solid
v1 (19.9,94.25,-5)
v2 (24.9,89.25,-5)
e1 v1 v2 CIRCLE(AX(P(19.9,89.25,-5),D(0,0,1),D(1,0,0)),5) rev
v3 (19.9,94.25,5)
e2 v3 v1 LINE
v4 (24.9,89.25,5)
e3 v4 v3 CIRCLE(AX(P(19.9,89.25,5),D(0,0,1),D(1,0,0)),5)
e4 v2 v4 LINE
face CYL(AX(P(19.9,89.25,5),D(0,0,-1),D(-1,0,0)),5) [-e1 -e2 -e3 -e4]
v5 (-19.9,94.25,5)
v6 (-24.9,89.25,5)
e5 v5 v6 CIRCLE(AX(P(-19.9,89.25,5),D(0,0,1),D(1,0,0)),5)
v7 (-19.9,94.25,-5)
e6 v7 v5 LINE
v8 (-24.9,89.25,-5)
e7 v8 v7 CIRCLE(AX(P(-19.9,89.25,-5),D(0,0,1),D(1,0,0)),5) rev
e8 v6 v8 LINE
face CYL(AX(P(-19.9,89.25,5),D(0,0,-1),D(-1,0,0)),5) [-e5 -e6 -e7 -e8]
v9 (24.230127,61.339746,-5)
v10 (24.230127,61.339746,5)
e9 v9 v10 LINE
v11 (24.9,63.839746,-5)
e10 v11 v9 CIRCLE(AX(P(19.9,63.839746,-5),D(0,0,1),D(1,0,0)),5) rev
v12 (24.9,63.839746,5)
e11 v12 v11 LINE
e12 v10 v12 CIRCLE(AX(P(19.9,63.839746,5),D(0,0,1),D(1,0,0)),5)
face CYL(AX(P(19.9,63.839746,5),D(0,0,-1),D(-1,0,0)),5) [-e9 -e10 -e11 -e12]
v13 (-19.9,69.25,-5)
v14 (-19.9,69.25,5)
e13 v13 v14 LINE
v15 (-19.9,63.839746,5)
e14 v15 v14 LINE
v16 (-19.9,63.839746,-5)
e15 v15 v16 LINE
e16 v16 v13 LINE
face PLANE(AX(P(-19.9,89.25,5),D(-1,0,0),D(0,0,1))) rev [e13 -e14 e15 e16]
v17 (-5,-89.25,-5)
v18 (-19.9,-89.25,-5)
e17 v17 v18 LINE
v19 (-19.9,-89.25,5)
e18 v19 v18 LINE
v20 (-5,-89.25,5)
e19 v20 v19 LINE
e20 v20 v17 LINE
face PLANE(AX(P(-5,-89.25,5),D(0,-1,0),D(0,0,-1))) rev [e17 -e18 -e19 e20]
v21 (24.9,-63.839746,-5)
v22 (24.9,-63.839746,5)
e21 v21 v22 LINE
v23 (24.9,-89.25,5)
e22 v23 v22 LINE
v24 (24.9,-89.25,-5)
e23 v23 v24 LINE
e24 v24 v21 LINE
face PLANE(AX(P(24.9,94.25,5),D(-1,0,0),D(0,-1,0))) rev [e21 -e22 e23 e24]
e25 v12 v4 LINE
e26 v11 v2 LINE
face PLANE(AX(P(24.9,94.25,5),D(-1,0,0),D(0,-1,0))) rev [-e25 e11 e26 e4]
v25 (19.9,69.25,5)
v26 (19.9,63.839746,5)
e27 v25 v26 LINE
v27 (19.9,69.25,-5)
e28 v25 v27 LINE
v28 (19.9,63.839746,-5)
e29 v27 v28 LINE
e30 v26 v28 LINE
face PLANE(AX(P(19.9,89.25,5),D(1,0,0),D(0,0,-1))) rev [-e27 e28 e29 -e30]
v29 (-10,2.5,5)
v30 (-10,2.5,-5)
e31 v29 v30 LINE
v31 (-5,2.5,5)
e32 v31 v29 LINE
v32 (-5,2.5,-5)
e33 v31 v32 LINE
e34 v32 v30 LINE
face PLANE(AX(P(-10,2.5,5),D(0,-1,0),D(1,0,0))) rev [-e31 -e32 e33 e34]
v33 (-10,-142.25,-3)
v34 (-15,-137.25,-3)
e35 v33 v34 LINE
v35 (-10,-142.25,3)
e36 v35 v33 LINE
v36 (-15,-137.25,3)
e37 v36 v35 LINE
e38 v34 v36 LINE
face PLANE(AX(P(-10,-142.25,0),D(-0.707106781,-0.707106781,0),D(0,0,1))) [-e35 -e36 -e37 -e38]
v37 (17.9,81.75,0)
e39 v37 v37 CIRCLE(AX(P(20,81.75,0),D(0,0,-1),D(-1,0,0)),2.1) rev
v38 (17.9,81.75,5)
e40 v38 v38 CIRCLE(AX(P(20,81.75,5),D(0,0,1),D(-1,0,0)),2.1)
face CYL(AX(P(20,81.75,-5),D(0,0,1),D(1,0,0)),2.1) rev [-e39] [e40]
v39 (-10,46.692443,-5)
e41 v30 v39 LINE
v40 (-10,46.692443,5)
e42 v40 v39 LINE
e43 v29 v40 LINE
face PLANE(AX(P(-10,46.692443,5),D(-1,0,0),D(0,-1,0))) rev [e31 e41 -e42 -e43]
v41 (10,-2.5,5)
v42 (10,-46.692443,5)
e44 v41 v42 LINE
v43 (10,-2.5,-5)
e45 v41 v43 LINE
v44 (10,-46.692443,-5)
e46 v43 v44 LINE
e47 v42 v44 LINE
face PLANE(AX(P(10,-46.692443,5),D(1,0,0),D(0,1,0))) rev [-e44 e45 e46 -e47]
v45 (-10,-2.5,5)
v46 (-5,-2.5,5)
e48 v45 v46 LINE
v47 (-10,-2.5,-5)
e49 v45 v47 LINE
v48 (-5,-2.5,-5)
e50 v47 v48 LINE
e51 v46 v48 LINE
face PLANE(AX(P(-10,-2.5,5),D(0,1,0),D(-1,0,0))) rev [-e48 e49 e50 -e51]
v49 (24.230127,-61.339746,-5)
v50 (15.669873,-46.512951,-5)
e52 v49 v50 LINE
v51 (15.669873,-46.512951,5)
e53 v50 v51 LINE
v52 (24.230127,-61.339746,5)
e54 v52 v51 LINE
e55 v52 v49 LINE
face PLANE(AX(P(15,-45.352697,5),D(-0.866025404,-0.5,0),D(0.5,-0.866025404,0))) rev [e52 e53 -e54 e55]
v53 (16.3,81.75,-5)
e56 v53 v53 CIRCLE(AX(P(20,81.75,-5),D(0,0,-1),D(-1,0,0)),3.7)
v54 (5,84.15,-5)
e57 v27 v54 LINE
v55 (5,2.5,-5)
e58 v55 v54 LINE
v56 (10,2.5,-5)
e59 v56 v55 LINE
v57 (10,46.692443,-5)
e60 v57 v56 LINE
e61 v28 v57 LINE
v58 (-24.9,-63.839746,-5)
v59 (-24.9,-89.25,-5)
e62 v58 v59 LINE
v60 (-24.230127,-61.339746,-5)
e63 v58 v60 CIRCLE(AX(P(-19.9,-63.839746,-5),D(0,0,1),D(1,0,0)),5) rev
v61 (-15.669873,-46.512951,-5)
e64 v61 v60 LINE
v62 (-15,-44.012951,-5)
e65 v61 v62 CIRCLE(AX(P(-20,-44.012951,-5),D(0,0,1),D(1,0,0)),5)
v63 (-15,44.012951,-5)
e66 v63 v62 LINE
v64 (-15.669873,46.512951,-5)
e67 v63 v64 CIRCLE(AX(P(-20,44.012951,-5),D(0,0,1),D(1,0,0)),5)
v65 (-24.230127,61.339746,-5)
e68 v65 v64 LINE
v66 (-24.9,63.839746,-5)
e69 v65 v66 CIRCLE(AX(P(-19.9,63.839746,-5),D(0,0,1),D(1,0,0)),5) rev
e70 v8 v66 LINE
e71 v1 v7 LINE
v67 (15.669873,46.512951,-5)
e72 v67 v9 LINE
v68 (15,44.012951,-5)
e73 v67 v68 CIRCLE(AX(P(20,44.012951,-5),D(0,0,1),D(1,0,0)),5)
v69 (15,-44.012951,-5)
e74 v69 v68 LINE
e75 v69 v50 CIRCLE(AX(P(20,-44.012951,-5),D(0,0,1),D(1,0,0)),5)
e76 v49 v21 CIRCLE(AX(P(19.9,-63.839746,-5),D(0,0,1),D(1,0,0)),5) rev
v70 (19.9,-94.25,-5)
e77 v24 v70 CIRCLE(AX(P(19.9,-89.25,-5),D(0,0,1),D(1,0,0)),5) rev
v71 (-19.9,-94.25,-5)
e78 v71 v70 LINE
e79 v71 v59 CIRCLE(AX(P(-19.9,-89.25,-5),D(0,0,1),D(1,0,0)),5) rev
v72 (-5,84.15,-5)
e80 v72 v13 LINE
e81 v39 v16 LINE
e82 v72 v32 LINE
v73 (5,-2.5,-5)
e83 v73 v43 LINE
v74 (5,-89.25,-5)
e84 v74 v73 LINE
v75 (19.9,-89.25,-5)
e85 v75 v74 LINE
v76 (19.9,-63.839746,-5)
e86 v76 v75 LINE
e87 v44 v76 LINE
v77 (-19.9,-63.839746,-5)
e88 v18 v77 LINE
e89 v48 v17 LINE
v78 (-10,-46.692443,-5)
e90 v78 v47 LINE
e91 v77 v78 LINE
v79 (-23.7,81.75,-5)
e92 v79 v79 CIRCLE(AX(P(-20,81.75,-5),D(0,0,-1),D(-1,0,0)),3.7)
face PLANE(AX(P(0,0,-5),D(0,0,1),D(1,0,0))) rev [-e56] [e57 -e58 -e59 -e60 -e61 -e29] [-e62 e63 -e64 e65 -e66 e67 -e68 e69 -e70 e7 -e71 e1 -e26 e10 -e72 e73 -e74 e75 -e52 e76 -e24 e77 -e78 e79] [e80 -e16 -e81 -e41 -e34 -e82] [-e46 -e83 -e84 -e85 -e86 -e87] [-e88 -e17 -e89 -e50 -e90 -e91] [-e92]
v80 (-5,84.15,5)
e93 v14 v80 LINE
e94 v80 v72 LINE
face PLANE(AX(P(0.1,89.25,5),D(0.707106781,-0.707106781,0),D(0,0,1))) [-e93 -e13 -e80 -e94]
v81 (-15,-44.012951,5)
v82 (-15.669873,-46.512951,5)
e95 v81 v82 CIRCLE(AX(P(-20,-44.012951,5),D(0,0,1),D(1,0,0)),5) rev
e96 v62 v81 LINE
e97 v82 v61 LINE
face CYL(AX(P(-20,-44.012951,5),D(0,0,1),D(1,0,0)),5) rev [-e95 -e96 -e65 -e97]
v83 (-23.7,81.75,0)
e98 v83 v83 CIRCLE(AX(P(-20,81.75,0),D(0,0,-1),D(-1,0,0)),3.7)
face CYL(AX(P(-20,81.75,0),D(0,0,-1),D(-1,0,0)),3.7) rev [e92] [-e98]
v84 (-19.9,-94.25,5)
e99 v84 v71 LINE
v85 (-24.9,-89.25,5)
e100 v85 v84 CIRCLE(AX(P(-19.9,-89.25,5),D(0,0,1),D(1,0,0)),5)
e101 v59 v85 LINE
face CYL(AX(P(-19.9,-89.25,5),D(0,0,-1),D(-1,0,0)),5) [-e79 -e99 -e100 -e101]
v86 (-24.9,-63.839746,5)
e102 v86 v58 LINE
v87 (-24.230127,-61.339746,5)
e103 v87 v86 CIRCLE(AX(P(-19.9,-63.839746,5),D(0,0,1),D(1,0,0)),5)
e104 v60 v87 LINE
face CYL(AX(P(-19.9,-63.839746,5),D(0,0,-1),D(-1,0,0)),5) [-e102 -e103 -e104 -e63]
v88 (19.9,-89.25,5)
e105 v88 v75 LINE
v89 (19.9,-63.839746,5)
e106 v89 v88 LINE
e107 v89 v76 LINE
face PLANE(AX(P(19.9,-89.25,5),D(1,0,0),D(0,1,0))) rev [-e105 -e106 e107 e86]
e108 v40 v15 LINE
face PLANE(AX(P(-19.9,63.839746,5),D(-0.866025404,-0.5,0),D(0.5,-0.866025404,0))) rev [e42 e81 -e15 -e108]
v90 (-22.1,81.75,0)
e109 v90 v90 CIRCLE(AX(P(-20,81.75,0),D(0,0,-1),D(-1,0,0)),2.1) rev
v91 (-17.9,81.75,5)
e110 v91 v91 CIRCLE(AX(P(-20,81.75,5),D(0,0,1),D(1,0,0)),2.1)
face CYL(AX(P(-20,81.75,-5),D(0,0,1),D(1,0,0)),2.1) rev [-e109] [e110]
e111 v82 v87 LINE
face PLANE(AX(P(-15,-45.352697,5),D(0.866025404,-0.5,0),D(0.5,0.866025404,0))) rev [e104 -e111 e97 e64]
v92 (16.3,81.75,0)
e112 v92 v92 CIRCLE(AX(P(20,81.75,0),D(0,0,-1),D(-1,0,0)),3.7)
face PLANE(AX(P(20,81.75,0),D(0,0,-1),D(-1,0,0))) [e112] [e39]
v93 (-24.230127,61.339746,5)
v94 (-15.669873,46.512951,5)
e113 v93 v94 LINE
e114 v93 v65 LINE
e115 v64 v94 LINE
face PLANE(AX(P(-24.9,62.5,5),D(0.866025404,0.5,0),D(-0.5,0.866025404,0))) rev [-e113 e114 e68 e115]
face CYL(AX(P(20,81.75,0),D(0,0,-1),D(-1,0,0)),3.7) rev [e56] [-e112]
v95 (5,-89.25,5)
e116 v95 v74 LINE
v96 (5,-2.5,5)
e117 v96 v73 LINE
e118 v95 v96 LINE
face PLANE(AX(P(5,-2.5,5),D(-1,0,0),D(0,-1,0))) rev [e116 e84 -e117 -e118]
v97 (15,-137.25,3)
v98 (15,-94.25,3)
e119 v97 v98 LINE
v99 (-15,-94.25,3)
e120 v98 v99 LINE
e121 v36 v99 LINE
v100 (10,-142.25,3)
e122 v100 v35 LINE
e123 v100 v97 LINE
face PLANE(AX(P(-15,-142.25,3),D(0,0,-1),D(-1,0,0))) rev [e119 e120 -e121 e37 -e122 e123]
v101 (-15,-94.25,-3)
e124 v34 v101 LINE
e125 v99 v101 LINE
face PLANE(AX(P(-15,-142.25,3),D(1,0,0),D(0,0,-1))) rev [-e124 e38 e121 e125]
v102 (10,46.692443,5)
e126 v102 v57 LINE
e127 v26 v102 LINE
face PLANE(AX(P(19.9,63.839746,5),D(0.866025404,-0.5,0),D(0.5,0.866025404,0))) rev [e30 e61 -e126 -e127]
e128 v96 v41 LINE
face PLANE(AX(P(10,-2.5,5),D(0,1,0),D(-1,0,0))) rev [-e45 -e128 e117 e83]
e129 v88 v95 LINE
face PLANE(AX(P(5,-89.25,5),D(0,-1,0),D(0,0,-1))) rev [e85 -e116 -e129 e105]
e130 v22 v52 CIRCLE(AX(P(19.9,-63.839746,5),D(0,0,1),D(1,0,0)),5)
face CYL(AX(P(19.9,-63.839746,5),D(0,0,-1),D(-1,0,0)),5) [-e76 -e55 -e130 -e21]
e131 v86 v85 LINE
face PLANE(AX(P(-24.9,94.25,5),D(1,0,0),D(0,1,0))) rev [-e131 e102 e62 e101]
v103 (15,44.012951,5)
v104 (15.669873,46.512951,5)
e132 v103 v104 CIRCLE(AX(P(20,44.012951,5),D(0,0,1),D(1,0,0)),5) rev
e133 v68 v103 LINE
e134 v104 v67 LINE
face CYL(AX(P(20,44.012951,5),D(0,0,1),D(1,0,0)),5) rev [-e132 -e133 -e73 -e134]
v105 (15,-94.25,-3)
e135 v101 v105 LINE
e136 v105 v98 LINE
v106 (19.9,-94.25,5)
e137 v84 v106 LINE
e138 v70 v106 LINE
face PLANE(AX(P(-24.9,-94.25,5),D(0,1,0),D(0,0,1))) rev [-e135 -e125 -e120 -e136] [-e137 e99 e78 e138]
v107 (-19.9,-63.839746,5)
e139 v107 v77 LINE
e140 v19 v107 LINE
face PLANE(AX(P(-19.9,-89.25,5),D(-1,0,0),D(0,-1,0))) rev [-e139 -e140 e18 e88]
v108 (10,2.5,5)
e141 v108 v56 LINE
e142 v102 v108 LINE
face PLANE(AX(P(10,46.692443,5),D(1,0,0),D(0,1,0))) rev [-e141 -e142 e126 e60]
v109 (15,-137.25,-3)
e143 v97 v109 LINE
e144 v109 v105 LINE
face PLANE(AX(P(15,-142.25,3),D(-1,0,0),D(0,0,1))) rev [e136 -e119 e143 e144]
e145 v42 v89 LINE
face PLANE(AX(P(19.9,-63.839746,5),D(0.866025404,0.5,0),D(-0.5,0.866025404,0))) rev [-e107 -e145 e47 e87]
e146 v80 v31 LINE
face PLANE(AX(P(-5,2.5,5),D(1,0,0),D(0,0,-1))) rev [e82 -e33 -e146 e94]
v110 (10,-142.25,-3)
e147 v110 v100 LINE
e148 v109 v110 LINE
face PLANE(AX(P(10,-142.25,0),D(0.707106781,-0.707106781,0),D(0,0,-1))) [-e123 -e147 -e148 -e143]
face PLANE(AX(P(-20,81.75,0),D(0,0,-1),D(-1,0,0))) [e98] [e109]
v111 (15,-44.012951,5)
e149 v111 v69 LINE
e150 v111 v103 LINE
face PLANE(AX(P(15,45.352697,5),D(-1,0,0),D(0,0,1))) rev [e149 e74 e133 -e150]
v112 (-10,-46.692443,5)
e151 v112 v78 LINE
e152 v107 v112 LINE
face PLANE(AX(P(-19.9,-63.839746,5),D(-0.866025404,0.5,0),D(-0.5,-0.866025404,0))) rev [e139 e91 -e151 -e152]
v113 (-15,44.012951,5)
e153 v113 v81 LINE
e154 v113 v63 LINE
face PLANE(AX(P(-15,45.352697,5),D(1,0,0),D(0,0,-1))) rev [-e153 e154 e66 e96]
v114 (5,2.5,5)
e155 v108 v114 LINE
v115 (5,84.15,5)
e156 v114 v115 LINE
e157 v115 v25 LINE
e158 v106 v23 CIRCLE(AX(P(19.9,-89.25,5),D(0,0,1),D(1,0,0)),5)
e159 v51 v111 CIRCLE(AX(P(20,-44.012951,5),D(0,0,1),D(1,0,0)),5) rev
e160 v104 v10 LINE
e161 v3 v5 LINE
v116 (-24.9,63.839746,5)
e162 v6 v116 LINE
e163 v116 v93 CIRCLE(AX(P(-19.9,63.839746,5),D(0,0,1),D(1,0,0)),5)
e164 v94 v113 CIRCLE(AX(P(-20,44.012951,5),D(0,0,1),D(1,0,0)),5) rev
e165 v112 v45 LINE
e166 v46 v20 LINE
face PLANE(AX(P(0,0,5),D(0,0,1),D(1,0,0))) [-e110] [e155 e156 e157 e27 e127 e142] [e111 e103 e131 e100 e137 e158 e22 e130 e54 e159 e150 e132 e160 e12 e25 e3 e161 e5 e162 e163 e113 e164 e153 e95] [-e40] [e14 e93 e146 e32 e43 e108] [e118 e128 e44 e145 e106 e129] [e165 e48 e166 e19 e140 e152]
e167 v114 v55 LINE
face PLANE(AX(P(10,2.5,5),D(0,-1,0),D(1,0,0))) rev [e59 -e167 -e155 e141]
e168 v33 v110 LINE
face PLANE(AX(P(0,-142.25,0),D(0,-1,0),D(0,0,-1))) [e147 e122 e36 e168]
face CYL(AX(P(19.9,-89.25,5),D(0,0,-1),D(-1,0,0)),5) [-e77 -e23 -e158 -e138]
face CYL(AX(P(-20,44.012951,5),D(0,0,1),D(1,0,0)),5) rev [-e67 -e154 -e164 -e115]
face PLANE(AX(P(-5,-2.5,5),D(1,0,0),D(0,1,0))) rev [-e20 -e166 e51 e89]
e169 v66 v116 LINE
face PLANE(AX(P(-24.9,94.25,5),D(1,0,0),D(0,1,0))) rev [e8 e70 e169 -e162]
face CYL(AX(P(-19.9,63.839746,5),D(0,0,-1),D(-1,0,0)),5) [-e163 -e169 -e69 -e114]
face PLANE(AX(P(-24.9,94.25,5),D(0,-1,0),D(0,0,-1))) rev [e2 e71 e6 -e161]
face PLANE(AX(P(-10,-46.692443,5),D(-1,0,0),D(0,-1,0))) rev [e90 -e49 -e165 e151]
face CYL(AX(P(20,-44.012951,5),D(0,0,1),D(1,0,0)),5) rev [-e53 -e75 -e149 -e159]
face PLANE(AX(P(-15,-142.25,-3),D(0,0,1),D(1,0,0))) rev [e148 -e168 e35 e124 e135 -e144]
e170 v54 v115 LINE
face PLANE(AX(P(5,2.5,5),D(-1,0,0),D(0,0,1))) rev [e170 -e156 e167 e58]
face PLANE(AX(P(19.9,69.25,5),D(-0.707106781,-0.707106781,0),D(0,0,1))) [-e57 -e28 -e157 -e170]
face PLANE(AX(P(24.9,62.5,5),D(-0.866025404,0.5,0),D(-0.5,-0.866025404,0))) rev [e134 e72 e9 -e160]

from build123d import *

# Parameters (mm, degrees)
SKETCH_1_W          = 49.8
SKETCH_1_H          = 188.5
EXTRUDE_1_DEPTH     = 5
CUT_EXTRUDE_1_DEPTH = 98.995267743
FILLET_1_R          = 5
CUT_EXTRUDE_2_DEPTH = 98.995267743
CHAMFER_2_SIZE      = 20
SKETCH_3_W          = 30
SKETCH_3_H          = 6
EXTRUDE_2_DEPTH     = 48
CHAMFER_3_SIZE      = 5
SKETCH_6_R          = 2.1
CUT_EXTRUDE_6_DEPTH = 145.758669861
SKETCH_7_R          = 3.7
CUT_EXTRUDE_7_DEPTH = 5


with BuildPart() as part:
    # 草图1 → 凸台-拉伸1 (new, symmetric)
    with BuildSketch(Plane.XY):
        Rectangle(SKETCH_1_W, SKETCH_1_H)
    extrude(amount=EXTRUDE_1_DEPTH, both=True)

    # 草图4 → 切除-拉伸1 (cut, through all)
    with BuildSketch(Plane(origin=(0, 0, -5), x_dir=(-1, 0, 0), z_dir=(0, 0, -1))):
        Polygon((-24.9, 62.5), (-15, 45.352697005), (-15, -45.352697005), (-24.9, -62.5), align=None)
        Polygon((24.9, -62.5), (24.9, 62.5), (15, 45.352697005), (15, -45.352697005), align=None)
    extrude(amount=-CUT_EXTRUDE_1_DEPTH, mode=Mode.SUBTRACT)

    # 圆角1
    fillet_1_edges = [part.edges().sort_by_distance(p)[0] for p in [
        (24.9, -62.5, 0),
        (24.9, 62.5, 0),
        (15, 45.352697005, 0),
        (15, -45.352697005, 0),
        (-24.9, -62.5, 0),
        (-15, -45.352697005, 0),
        (-15, 45.352697005, 0),
        (-24.9, 62.5, 0),
        (24.9, -94.25, 0),
        (-24.9, -94.25, 0),
        (-24.9, 94.25, 0),
        (24.9, 94.25, 0),
    ]]
    fillet(fillet_1_edges, radius=FILLET_1_R)

    # 草图5 → 切除-拉伸2 (cut, through all)
    with BuildSketch(Plane(origin=(0, 0, -5), x_dir=(-1, 0, 0), z_dir=(0, 0, -1))):
        Polygon((-19.9, 89.25), (-19.9, 63.839745962), (-10, 46.692442967), (-10, 2.5), (-5, 2.5), (-5, 89.25), align=None)
        Polygon((5, 89.25), (19.9, 89.25), (19.9, 63.839745962), (10, 46.692442967), (10, 2.5), (5, 2.5), align=None)
        Polygon((19.9, -89.25), (19.9, -63.839745962), (10, -46.692442967), (10, -2.5), (5, -2.5), (5, -89.25), align=None)
        Polygon((-5, -89.25), (-19.9, -89.25), (-19.9, -63.839745962), (-10, -46.692442967), (-10, -2.5), (-5, -2.5), align=None)
    extrude(amount=-CUT_EXTRUDE_2_DEPTH, mode=Mode.SUBTRACT)

    # 倒角2
    # the kernel refuses this chamfer: 20 mm, written as the material it adds along each edge
    with BuildSketch(Plane(origin=(-19.9, 89.25, -5), x_dir=(-0.027495876610586317, -0.9996219169112968, 0), z_dir=(0, 0, 1))) as chamfer_2_piece_1:
        Polygon((CHAMFER_2_SIZE * 0.999621916911, CHAMFER_2_SIZE * 0.0274958766106), (-CHAMFER_2_SIZE * 0.0274958766106, CHAMFER_2_SIZE * 0.999621916911), (0, 0), align=None)
    extrude(amount=10)
    with BuildSketch(Plane(origin=(19.9, 89.25, -5), x_dir=(0.027495876610586317, -0.9996219169112968, 0), z_dir=(0, 0, 1))) as chamfer_2_piece_2:
        Polygon((CHAMFER_2_SIZE * 0.999621916911, -CHAMFER_2_SIZE * 0.0274958766106), (-CHAMFER_2_SIZE * 0.0274958766106, -CHAMFER_2_SIZE * 0.999621916911), (0, 0), align=None)
    extrude(amount=10)

    # 草图3 → 凸台-拉伸2 (add)
    with BuildSketch(Plane.XZ.offset(94.25)):
        Rectangle(SKETCH_3_W, SKETCH_3_H)
    extrude(amount=EXTRUDE_2_DEPTH)

    # 倒角3
    chamfer_3_edges = [part.edges().sort_by_distance(p)[0] for p in [
        (15, -142.25, 0),
        (-15, -142.25, 0),
    ]]
    chamfer(chamfer_3_edges, length=CHAMFER_3_SIZE)

    # 草图6 → 切除-拉伸6 (cut, through all)
    with BuildSketch(Plane.XY.offset(5)):
        with Locations((-20, 81.75)):
            Circle(SKETCH_6_R)
        with Locations(Location((20, 81.75, 0), (0, 0, 180))):
            Circle(SKETCH_6_R)
    extrude(amount=-CUT_EXTRUDE_6_DEPTH, mode=Mode.SUBTRACT)

    # 草图7 → 切除-拉伸7 (cut)
    with BuildSketch(Plane(origin=(0, 0, -5), x_dir=(-1, 0, 0), z_dir=(0, 0, -1))):
        with Locations((20, 81.75)):
            Circle(SKETCH_7_R)
        with Locations((-20, 81.75)):
            Circle(SKETCH_7_R)
    extrude(amount=-CUT_EXTRUDE_7_DEPTH, mode=Mode.SUBTRACT)


solid = part.part
